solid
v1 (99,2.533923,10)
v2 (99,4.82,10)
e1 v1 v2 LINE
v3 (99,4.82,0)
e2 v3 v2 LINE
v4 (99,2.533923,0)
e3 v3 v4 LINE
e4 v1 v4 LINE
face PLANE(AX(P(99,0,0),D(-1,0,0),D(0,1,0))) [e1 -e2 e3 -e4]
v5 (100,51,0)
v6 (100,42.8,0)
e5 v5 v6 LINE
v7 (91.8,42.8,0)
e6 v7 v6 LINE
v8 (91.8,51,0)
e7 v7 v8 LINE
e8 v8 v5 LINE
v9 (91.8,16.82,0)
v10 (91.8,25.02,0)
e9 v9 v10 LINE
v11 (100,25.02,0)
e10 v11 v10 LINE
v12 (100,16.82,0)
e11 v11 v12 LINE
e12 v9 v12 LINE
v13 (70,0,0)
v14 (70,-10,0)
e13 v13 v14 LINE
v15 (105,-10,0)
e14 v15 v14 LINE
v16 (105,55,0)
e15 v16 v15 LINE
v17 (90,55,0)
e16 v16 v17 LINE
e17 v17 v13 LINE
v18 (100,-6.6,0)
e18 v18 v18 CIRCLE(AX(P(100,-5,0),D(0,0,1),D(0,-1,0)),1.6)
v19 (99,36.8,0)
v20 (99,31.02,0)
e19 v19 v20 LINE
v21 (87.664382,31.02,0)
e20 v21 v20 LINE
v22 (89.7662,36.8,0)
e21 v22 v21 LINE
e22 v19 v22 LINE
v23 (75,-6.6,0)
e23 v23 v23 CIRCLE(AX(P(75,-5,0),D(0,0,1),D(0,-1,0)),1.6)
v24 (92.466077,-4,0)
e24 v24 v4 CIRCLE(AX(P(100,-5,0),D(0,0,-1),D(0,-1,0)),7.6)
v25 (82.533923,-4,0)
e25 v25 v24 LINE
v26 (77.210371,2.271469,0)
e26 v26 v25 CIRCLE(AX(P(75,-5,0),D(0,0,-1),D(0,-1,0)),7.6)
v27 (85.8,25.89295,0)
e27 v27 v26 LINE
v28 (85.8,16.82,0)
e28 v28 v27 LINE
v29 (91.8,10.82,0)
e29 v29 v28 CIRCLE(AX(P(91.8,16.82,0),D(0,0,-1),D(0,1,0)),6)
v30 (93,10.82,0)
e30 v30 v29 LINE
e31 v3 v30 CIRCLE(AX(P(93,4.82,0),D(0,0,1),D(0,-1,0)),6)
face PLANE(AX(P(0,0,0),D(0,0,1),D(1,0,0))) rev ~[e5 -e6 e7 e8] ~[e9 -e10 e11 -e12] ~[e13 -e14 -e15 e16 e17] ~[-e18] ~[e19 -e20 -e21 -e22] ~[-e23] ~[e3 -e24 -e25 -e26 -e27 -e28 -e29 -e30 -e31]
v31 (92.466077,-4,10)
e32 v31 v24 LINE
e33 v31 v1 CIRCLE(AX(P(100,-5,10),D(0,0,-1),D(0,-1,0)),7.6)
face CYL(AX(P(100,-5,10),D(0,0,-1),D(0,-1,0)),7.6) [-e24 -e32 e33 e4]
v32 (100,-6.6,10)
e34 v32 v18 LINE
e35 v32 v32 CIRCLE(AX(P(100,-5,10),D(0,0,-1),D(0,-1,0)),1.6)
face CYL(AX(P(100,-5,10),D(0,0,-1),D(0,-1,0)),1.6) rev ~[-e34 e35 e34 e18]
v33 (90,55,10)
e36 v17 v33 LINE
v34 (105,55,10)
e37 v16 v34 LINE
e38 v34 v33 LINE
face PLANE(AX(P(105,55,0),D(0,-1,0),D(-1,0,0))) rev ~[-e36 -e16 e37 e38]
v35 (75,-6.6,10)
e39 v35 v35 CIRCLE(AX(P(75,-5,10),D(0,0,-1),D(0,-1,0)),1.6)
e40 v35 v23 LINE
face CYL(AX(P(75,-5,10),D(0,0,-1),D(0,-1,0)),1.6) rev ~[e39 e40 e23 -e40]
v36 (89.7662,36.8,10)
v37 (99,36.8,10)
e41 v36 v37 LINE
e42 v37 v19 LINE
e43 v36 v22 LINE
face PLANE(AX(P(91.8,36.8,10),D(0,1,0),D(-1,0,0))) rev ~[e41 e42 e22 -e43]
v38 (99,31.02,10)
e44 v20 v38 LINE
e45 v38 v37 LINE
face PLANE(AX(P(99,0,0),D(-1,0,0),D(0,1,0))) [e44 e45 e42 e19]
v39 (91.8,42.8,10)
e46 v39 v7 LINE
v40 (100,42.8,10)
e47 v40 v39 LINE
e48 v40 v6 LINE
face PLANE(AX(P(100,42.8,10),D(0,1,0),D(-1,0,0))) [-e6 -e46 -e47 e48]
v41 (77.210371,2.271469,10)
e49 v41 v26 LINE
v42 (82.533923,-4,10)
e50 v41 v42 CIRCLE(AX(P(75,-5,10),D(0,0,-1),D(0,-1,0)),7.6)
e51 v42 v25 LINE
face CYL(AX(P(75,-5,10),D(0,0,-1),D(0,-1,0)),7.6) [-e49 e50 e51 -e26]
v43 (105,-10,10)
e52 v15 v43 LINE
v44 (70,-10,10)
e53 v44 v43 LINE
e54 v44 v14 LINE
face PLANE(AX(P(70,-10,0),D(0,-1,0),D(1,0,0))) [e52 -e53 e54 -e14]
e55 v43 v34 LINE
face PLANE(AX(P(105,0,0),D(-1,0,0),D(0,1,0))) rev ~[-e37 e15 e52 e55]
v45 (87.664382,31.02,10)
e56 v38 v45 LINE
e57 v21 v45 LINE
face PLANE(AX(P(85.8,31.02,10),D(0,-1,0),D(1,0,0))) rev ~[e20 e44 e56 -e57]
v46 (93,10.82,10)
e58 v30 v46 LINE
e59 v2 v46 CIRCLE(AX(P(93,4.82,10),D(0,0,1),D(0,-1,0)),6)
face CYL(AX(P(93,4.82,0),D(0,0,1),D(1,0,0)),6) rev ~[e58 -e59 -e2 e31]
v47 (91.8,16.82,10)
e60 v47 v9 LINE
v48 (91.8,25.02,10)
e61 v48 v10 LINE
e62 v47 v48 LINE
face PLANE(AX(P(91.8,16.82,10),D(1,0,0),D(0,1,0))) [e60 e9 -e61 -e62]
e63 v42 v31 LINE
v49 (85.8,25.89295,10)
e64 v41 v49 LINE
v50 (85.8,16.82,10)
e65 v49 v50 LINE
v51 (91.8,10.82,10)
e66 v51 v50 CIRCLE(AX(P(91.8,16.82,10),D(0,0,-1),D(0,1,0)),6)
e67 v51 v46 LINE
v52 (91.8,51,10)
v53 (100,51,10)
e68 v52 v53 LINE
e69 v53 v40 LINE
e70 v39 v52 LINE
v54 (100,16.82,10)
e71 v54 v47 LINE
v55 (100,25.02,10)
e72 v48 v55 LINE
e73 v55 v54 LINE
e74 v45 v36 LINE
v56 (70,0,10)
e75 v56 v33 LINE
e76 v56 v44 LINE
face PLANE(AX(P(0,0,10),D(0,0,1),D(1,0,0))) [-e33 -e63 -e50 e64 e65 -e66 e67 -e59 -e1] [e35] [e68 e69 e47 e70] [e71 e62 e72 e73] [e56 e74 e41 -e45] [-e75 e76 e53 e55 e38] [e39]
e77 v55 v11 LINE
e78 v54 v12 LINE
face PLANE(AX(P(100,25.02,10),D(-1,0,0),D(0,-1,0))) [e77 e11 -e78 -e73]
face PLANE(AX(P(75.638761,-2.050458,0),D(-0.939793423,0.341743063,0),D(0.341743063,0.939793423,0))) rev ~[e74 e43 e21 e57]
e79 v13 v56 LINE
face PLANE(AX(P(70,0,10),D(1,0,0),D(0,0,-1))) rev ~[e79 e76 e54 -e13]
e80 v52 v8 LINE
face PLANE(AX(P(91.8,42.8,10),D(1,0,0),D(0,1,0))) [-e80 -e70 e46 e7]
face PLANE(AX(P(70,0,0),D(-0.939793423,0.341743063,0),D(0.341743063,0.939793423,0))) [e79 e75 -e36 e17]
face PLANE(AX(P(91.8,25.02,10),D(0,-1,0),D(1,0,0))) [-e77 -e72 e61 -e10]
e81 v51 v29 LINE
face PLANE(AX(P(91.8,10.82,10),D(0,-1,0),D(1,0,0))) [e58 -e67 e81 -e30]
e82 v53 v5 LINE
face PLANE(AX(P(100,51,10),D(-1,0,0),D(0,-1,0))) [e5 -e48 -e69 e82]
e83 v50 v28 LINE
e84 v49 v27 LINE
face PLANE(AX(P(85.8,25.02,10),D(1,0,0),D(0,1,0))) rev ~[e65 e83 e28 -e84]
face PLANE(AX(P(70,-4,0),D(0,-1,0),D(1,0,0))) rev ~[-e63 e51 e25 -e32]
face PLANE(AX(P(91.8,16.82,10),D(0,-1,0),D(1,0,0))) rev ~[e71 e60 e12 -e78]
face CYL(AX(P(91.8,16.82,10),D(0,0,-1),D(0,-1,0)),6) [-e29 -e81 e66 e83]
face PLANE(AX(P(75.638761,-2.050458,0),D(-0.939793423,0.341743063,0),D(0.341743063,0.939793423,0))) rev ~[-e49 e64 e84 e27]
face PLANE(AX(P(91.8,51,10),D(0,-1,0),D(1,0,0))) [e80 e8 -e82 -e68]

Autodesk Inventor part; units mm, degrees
ref_plane "YZ Plane" through (0, 0, 0) normal (1, 0, 0) x (0, 1, 0)
ref_plane "XZ Plane" through (0, 0, 0) normal (0, 1, 0) x (-1, 0, 0)
ref_plane "XY Plane" through (0, 0, 0) normal (0, 0, 1) x (1, 0, 0)
sketch "Boceto1" plane through (0, 0, 0) normal (0, 0, 1) x (1, 0, 0)
  line L0 (0, 0) -> (105, 0)
  line L1 (105, 0) -> (105, 55)
  line L2 (105, 55) -> (0, 0)
  line L3 (105, 55) -> (90, 55)
  line L4 (90, 55) -> (0, 0)
  line L5 (0, 0) -> (70, 0)
  line L6 (70, 0) -> (90, 55)
  dimension "d0" = 105
  dimension "d1" = 55
  dimension "d4" = 15
  dimension "d10" = 70
extrude "Extrusión1" add sketch "Boceto1" along normal blind 10 contours L6 L2 L1 L0 | L6 L3 L2
sketch "Boceto2" plane through (0, 0, 10) normal (0, 0, 1) x (1, 0, 0)
  line L0 (-10.0369, 16.82) -> (-5.1631, 16.82) projected
  line L1 (-1.5564, 16.82) -> (-5.1631, 16.82) projected
  line L2 (-1.5564, 16.82) -> (105, 16.82)
  line L3 (105, 0) -> (105, 55) projected
  line L4 (105, 55) -> (90, 55) projected
  line L5 (70, 0) -> (105, 0) projected
  line L6 (100, 5) -> (14.5727, 5)
  line L7 (90, 55) -> (70, 0) projected
  line L8 (105, 55) -> (105, 42.8)
  line L9 (105, 55) -> (117.2, 55) construction
  line L10 (70, 0) -> (105, 0) projected
  line L11 (105, 0) -> (105, 16.82)
  line L12 (105, 0) -> (105, 55) projected
  line L13 (105, 16.82) -> (100, 16.82)
  line L14 (100, 16.82) -> (94.1, 16.82)
  line L15 (94.1, 16.82) -> (94.1, 25.02)
  line L16 (94.1, 25.02) -> (100, 25.02)
  line L17 (100, 25.02) -> (100, 16.82)
  line L18 (105, 42.8) -> (100, 42.8)
  line L19 (100, 42.8) -> (91.8, 42.8)
  line L20 (91.8, 42.8) -> (91.8, 51)
  line L21 (91.8, 51) -> (100, 51)
  line L22 (100, 51) -> (100, 42.8)
  line L23 (100, 16.82) -> (91.8, 16.82)
  line L24 (91.8, 16.82) -> (91.8, 25.02)
  line L25 (91.8, 25.02) -> (100, 25.02)
  line L26 (100, 25.02) -> (100, 16.82)
  point P0 (0, 0)
  point P1 (94.1, 16.82)
  point P2 (100, 25.02)
  point P3 (91.8, 16.82)
  point P4 (105, 25.02)
  point P5 (162.8, 25.02)
  point P6 (162.8, 16.82)
  dimension "d22" = 90
  dimension "d25" = 8.2
  dimension "d26" = 12.2
  dimension "d27" = 8.2
  dimension "d28" = 8.2
  dimension "d31" = 8.2
extrude "Extrusión2" cut sketch "Boceto2" against normal through all contours L24 L25 L15 L2 | L15 L16 L17 L2 | L19 L20 L21 L22
sketch "Boceto3" plane through (70, 0, 0) normal (0, -1, 0) x (1, 0, 0)
  line L0 (21.8, 10) -> (21.8, 0) projected
  line L1 (0, 10) -> (35, 10) projected
  line L2 (0, 0) -> (35, 0) projected
  line L3 (35, 0) -> (35, 10) projected
  line L4 (0, 10) -> (0, 0) projected
  point P0 (-70, 0)
extrude "Extrusión3" add sketch "Boceto3" along normal blind 10
sketch "Boceto4" plane through (0, 0, 10) normal (0, 0, 1) x (1, 0, 0)
  circle A0 centre (100, -5) radius 2.1 projected
  circle A1 centre (75, -5) radius 2.1 projected
  point P0 (0, 0)
hole "Agujero1" at (75, -5, 10) at (100, -5, 10) direction (0, 0, -1) diameter 3.2 depth 10
shell "Vaciado1" thickness 6 removed faces 2 at (88.9333, 2.8793, 10) at (88.9333, 2.8793, 0)
fillet "Empalme1" radius 6 2 edges at (99, 10.82, 5) (85.8, 10.82, 5)
properties part number "Soporte lateral"
